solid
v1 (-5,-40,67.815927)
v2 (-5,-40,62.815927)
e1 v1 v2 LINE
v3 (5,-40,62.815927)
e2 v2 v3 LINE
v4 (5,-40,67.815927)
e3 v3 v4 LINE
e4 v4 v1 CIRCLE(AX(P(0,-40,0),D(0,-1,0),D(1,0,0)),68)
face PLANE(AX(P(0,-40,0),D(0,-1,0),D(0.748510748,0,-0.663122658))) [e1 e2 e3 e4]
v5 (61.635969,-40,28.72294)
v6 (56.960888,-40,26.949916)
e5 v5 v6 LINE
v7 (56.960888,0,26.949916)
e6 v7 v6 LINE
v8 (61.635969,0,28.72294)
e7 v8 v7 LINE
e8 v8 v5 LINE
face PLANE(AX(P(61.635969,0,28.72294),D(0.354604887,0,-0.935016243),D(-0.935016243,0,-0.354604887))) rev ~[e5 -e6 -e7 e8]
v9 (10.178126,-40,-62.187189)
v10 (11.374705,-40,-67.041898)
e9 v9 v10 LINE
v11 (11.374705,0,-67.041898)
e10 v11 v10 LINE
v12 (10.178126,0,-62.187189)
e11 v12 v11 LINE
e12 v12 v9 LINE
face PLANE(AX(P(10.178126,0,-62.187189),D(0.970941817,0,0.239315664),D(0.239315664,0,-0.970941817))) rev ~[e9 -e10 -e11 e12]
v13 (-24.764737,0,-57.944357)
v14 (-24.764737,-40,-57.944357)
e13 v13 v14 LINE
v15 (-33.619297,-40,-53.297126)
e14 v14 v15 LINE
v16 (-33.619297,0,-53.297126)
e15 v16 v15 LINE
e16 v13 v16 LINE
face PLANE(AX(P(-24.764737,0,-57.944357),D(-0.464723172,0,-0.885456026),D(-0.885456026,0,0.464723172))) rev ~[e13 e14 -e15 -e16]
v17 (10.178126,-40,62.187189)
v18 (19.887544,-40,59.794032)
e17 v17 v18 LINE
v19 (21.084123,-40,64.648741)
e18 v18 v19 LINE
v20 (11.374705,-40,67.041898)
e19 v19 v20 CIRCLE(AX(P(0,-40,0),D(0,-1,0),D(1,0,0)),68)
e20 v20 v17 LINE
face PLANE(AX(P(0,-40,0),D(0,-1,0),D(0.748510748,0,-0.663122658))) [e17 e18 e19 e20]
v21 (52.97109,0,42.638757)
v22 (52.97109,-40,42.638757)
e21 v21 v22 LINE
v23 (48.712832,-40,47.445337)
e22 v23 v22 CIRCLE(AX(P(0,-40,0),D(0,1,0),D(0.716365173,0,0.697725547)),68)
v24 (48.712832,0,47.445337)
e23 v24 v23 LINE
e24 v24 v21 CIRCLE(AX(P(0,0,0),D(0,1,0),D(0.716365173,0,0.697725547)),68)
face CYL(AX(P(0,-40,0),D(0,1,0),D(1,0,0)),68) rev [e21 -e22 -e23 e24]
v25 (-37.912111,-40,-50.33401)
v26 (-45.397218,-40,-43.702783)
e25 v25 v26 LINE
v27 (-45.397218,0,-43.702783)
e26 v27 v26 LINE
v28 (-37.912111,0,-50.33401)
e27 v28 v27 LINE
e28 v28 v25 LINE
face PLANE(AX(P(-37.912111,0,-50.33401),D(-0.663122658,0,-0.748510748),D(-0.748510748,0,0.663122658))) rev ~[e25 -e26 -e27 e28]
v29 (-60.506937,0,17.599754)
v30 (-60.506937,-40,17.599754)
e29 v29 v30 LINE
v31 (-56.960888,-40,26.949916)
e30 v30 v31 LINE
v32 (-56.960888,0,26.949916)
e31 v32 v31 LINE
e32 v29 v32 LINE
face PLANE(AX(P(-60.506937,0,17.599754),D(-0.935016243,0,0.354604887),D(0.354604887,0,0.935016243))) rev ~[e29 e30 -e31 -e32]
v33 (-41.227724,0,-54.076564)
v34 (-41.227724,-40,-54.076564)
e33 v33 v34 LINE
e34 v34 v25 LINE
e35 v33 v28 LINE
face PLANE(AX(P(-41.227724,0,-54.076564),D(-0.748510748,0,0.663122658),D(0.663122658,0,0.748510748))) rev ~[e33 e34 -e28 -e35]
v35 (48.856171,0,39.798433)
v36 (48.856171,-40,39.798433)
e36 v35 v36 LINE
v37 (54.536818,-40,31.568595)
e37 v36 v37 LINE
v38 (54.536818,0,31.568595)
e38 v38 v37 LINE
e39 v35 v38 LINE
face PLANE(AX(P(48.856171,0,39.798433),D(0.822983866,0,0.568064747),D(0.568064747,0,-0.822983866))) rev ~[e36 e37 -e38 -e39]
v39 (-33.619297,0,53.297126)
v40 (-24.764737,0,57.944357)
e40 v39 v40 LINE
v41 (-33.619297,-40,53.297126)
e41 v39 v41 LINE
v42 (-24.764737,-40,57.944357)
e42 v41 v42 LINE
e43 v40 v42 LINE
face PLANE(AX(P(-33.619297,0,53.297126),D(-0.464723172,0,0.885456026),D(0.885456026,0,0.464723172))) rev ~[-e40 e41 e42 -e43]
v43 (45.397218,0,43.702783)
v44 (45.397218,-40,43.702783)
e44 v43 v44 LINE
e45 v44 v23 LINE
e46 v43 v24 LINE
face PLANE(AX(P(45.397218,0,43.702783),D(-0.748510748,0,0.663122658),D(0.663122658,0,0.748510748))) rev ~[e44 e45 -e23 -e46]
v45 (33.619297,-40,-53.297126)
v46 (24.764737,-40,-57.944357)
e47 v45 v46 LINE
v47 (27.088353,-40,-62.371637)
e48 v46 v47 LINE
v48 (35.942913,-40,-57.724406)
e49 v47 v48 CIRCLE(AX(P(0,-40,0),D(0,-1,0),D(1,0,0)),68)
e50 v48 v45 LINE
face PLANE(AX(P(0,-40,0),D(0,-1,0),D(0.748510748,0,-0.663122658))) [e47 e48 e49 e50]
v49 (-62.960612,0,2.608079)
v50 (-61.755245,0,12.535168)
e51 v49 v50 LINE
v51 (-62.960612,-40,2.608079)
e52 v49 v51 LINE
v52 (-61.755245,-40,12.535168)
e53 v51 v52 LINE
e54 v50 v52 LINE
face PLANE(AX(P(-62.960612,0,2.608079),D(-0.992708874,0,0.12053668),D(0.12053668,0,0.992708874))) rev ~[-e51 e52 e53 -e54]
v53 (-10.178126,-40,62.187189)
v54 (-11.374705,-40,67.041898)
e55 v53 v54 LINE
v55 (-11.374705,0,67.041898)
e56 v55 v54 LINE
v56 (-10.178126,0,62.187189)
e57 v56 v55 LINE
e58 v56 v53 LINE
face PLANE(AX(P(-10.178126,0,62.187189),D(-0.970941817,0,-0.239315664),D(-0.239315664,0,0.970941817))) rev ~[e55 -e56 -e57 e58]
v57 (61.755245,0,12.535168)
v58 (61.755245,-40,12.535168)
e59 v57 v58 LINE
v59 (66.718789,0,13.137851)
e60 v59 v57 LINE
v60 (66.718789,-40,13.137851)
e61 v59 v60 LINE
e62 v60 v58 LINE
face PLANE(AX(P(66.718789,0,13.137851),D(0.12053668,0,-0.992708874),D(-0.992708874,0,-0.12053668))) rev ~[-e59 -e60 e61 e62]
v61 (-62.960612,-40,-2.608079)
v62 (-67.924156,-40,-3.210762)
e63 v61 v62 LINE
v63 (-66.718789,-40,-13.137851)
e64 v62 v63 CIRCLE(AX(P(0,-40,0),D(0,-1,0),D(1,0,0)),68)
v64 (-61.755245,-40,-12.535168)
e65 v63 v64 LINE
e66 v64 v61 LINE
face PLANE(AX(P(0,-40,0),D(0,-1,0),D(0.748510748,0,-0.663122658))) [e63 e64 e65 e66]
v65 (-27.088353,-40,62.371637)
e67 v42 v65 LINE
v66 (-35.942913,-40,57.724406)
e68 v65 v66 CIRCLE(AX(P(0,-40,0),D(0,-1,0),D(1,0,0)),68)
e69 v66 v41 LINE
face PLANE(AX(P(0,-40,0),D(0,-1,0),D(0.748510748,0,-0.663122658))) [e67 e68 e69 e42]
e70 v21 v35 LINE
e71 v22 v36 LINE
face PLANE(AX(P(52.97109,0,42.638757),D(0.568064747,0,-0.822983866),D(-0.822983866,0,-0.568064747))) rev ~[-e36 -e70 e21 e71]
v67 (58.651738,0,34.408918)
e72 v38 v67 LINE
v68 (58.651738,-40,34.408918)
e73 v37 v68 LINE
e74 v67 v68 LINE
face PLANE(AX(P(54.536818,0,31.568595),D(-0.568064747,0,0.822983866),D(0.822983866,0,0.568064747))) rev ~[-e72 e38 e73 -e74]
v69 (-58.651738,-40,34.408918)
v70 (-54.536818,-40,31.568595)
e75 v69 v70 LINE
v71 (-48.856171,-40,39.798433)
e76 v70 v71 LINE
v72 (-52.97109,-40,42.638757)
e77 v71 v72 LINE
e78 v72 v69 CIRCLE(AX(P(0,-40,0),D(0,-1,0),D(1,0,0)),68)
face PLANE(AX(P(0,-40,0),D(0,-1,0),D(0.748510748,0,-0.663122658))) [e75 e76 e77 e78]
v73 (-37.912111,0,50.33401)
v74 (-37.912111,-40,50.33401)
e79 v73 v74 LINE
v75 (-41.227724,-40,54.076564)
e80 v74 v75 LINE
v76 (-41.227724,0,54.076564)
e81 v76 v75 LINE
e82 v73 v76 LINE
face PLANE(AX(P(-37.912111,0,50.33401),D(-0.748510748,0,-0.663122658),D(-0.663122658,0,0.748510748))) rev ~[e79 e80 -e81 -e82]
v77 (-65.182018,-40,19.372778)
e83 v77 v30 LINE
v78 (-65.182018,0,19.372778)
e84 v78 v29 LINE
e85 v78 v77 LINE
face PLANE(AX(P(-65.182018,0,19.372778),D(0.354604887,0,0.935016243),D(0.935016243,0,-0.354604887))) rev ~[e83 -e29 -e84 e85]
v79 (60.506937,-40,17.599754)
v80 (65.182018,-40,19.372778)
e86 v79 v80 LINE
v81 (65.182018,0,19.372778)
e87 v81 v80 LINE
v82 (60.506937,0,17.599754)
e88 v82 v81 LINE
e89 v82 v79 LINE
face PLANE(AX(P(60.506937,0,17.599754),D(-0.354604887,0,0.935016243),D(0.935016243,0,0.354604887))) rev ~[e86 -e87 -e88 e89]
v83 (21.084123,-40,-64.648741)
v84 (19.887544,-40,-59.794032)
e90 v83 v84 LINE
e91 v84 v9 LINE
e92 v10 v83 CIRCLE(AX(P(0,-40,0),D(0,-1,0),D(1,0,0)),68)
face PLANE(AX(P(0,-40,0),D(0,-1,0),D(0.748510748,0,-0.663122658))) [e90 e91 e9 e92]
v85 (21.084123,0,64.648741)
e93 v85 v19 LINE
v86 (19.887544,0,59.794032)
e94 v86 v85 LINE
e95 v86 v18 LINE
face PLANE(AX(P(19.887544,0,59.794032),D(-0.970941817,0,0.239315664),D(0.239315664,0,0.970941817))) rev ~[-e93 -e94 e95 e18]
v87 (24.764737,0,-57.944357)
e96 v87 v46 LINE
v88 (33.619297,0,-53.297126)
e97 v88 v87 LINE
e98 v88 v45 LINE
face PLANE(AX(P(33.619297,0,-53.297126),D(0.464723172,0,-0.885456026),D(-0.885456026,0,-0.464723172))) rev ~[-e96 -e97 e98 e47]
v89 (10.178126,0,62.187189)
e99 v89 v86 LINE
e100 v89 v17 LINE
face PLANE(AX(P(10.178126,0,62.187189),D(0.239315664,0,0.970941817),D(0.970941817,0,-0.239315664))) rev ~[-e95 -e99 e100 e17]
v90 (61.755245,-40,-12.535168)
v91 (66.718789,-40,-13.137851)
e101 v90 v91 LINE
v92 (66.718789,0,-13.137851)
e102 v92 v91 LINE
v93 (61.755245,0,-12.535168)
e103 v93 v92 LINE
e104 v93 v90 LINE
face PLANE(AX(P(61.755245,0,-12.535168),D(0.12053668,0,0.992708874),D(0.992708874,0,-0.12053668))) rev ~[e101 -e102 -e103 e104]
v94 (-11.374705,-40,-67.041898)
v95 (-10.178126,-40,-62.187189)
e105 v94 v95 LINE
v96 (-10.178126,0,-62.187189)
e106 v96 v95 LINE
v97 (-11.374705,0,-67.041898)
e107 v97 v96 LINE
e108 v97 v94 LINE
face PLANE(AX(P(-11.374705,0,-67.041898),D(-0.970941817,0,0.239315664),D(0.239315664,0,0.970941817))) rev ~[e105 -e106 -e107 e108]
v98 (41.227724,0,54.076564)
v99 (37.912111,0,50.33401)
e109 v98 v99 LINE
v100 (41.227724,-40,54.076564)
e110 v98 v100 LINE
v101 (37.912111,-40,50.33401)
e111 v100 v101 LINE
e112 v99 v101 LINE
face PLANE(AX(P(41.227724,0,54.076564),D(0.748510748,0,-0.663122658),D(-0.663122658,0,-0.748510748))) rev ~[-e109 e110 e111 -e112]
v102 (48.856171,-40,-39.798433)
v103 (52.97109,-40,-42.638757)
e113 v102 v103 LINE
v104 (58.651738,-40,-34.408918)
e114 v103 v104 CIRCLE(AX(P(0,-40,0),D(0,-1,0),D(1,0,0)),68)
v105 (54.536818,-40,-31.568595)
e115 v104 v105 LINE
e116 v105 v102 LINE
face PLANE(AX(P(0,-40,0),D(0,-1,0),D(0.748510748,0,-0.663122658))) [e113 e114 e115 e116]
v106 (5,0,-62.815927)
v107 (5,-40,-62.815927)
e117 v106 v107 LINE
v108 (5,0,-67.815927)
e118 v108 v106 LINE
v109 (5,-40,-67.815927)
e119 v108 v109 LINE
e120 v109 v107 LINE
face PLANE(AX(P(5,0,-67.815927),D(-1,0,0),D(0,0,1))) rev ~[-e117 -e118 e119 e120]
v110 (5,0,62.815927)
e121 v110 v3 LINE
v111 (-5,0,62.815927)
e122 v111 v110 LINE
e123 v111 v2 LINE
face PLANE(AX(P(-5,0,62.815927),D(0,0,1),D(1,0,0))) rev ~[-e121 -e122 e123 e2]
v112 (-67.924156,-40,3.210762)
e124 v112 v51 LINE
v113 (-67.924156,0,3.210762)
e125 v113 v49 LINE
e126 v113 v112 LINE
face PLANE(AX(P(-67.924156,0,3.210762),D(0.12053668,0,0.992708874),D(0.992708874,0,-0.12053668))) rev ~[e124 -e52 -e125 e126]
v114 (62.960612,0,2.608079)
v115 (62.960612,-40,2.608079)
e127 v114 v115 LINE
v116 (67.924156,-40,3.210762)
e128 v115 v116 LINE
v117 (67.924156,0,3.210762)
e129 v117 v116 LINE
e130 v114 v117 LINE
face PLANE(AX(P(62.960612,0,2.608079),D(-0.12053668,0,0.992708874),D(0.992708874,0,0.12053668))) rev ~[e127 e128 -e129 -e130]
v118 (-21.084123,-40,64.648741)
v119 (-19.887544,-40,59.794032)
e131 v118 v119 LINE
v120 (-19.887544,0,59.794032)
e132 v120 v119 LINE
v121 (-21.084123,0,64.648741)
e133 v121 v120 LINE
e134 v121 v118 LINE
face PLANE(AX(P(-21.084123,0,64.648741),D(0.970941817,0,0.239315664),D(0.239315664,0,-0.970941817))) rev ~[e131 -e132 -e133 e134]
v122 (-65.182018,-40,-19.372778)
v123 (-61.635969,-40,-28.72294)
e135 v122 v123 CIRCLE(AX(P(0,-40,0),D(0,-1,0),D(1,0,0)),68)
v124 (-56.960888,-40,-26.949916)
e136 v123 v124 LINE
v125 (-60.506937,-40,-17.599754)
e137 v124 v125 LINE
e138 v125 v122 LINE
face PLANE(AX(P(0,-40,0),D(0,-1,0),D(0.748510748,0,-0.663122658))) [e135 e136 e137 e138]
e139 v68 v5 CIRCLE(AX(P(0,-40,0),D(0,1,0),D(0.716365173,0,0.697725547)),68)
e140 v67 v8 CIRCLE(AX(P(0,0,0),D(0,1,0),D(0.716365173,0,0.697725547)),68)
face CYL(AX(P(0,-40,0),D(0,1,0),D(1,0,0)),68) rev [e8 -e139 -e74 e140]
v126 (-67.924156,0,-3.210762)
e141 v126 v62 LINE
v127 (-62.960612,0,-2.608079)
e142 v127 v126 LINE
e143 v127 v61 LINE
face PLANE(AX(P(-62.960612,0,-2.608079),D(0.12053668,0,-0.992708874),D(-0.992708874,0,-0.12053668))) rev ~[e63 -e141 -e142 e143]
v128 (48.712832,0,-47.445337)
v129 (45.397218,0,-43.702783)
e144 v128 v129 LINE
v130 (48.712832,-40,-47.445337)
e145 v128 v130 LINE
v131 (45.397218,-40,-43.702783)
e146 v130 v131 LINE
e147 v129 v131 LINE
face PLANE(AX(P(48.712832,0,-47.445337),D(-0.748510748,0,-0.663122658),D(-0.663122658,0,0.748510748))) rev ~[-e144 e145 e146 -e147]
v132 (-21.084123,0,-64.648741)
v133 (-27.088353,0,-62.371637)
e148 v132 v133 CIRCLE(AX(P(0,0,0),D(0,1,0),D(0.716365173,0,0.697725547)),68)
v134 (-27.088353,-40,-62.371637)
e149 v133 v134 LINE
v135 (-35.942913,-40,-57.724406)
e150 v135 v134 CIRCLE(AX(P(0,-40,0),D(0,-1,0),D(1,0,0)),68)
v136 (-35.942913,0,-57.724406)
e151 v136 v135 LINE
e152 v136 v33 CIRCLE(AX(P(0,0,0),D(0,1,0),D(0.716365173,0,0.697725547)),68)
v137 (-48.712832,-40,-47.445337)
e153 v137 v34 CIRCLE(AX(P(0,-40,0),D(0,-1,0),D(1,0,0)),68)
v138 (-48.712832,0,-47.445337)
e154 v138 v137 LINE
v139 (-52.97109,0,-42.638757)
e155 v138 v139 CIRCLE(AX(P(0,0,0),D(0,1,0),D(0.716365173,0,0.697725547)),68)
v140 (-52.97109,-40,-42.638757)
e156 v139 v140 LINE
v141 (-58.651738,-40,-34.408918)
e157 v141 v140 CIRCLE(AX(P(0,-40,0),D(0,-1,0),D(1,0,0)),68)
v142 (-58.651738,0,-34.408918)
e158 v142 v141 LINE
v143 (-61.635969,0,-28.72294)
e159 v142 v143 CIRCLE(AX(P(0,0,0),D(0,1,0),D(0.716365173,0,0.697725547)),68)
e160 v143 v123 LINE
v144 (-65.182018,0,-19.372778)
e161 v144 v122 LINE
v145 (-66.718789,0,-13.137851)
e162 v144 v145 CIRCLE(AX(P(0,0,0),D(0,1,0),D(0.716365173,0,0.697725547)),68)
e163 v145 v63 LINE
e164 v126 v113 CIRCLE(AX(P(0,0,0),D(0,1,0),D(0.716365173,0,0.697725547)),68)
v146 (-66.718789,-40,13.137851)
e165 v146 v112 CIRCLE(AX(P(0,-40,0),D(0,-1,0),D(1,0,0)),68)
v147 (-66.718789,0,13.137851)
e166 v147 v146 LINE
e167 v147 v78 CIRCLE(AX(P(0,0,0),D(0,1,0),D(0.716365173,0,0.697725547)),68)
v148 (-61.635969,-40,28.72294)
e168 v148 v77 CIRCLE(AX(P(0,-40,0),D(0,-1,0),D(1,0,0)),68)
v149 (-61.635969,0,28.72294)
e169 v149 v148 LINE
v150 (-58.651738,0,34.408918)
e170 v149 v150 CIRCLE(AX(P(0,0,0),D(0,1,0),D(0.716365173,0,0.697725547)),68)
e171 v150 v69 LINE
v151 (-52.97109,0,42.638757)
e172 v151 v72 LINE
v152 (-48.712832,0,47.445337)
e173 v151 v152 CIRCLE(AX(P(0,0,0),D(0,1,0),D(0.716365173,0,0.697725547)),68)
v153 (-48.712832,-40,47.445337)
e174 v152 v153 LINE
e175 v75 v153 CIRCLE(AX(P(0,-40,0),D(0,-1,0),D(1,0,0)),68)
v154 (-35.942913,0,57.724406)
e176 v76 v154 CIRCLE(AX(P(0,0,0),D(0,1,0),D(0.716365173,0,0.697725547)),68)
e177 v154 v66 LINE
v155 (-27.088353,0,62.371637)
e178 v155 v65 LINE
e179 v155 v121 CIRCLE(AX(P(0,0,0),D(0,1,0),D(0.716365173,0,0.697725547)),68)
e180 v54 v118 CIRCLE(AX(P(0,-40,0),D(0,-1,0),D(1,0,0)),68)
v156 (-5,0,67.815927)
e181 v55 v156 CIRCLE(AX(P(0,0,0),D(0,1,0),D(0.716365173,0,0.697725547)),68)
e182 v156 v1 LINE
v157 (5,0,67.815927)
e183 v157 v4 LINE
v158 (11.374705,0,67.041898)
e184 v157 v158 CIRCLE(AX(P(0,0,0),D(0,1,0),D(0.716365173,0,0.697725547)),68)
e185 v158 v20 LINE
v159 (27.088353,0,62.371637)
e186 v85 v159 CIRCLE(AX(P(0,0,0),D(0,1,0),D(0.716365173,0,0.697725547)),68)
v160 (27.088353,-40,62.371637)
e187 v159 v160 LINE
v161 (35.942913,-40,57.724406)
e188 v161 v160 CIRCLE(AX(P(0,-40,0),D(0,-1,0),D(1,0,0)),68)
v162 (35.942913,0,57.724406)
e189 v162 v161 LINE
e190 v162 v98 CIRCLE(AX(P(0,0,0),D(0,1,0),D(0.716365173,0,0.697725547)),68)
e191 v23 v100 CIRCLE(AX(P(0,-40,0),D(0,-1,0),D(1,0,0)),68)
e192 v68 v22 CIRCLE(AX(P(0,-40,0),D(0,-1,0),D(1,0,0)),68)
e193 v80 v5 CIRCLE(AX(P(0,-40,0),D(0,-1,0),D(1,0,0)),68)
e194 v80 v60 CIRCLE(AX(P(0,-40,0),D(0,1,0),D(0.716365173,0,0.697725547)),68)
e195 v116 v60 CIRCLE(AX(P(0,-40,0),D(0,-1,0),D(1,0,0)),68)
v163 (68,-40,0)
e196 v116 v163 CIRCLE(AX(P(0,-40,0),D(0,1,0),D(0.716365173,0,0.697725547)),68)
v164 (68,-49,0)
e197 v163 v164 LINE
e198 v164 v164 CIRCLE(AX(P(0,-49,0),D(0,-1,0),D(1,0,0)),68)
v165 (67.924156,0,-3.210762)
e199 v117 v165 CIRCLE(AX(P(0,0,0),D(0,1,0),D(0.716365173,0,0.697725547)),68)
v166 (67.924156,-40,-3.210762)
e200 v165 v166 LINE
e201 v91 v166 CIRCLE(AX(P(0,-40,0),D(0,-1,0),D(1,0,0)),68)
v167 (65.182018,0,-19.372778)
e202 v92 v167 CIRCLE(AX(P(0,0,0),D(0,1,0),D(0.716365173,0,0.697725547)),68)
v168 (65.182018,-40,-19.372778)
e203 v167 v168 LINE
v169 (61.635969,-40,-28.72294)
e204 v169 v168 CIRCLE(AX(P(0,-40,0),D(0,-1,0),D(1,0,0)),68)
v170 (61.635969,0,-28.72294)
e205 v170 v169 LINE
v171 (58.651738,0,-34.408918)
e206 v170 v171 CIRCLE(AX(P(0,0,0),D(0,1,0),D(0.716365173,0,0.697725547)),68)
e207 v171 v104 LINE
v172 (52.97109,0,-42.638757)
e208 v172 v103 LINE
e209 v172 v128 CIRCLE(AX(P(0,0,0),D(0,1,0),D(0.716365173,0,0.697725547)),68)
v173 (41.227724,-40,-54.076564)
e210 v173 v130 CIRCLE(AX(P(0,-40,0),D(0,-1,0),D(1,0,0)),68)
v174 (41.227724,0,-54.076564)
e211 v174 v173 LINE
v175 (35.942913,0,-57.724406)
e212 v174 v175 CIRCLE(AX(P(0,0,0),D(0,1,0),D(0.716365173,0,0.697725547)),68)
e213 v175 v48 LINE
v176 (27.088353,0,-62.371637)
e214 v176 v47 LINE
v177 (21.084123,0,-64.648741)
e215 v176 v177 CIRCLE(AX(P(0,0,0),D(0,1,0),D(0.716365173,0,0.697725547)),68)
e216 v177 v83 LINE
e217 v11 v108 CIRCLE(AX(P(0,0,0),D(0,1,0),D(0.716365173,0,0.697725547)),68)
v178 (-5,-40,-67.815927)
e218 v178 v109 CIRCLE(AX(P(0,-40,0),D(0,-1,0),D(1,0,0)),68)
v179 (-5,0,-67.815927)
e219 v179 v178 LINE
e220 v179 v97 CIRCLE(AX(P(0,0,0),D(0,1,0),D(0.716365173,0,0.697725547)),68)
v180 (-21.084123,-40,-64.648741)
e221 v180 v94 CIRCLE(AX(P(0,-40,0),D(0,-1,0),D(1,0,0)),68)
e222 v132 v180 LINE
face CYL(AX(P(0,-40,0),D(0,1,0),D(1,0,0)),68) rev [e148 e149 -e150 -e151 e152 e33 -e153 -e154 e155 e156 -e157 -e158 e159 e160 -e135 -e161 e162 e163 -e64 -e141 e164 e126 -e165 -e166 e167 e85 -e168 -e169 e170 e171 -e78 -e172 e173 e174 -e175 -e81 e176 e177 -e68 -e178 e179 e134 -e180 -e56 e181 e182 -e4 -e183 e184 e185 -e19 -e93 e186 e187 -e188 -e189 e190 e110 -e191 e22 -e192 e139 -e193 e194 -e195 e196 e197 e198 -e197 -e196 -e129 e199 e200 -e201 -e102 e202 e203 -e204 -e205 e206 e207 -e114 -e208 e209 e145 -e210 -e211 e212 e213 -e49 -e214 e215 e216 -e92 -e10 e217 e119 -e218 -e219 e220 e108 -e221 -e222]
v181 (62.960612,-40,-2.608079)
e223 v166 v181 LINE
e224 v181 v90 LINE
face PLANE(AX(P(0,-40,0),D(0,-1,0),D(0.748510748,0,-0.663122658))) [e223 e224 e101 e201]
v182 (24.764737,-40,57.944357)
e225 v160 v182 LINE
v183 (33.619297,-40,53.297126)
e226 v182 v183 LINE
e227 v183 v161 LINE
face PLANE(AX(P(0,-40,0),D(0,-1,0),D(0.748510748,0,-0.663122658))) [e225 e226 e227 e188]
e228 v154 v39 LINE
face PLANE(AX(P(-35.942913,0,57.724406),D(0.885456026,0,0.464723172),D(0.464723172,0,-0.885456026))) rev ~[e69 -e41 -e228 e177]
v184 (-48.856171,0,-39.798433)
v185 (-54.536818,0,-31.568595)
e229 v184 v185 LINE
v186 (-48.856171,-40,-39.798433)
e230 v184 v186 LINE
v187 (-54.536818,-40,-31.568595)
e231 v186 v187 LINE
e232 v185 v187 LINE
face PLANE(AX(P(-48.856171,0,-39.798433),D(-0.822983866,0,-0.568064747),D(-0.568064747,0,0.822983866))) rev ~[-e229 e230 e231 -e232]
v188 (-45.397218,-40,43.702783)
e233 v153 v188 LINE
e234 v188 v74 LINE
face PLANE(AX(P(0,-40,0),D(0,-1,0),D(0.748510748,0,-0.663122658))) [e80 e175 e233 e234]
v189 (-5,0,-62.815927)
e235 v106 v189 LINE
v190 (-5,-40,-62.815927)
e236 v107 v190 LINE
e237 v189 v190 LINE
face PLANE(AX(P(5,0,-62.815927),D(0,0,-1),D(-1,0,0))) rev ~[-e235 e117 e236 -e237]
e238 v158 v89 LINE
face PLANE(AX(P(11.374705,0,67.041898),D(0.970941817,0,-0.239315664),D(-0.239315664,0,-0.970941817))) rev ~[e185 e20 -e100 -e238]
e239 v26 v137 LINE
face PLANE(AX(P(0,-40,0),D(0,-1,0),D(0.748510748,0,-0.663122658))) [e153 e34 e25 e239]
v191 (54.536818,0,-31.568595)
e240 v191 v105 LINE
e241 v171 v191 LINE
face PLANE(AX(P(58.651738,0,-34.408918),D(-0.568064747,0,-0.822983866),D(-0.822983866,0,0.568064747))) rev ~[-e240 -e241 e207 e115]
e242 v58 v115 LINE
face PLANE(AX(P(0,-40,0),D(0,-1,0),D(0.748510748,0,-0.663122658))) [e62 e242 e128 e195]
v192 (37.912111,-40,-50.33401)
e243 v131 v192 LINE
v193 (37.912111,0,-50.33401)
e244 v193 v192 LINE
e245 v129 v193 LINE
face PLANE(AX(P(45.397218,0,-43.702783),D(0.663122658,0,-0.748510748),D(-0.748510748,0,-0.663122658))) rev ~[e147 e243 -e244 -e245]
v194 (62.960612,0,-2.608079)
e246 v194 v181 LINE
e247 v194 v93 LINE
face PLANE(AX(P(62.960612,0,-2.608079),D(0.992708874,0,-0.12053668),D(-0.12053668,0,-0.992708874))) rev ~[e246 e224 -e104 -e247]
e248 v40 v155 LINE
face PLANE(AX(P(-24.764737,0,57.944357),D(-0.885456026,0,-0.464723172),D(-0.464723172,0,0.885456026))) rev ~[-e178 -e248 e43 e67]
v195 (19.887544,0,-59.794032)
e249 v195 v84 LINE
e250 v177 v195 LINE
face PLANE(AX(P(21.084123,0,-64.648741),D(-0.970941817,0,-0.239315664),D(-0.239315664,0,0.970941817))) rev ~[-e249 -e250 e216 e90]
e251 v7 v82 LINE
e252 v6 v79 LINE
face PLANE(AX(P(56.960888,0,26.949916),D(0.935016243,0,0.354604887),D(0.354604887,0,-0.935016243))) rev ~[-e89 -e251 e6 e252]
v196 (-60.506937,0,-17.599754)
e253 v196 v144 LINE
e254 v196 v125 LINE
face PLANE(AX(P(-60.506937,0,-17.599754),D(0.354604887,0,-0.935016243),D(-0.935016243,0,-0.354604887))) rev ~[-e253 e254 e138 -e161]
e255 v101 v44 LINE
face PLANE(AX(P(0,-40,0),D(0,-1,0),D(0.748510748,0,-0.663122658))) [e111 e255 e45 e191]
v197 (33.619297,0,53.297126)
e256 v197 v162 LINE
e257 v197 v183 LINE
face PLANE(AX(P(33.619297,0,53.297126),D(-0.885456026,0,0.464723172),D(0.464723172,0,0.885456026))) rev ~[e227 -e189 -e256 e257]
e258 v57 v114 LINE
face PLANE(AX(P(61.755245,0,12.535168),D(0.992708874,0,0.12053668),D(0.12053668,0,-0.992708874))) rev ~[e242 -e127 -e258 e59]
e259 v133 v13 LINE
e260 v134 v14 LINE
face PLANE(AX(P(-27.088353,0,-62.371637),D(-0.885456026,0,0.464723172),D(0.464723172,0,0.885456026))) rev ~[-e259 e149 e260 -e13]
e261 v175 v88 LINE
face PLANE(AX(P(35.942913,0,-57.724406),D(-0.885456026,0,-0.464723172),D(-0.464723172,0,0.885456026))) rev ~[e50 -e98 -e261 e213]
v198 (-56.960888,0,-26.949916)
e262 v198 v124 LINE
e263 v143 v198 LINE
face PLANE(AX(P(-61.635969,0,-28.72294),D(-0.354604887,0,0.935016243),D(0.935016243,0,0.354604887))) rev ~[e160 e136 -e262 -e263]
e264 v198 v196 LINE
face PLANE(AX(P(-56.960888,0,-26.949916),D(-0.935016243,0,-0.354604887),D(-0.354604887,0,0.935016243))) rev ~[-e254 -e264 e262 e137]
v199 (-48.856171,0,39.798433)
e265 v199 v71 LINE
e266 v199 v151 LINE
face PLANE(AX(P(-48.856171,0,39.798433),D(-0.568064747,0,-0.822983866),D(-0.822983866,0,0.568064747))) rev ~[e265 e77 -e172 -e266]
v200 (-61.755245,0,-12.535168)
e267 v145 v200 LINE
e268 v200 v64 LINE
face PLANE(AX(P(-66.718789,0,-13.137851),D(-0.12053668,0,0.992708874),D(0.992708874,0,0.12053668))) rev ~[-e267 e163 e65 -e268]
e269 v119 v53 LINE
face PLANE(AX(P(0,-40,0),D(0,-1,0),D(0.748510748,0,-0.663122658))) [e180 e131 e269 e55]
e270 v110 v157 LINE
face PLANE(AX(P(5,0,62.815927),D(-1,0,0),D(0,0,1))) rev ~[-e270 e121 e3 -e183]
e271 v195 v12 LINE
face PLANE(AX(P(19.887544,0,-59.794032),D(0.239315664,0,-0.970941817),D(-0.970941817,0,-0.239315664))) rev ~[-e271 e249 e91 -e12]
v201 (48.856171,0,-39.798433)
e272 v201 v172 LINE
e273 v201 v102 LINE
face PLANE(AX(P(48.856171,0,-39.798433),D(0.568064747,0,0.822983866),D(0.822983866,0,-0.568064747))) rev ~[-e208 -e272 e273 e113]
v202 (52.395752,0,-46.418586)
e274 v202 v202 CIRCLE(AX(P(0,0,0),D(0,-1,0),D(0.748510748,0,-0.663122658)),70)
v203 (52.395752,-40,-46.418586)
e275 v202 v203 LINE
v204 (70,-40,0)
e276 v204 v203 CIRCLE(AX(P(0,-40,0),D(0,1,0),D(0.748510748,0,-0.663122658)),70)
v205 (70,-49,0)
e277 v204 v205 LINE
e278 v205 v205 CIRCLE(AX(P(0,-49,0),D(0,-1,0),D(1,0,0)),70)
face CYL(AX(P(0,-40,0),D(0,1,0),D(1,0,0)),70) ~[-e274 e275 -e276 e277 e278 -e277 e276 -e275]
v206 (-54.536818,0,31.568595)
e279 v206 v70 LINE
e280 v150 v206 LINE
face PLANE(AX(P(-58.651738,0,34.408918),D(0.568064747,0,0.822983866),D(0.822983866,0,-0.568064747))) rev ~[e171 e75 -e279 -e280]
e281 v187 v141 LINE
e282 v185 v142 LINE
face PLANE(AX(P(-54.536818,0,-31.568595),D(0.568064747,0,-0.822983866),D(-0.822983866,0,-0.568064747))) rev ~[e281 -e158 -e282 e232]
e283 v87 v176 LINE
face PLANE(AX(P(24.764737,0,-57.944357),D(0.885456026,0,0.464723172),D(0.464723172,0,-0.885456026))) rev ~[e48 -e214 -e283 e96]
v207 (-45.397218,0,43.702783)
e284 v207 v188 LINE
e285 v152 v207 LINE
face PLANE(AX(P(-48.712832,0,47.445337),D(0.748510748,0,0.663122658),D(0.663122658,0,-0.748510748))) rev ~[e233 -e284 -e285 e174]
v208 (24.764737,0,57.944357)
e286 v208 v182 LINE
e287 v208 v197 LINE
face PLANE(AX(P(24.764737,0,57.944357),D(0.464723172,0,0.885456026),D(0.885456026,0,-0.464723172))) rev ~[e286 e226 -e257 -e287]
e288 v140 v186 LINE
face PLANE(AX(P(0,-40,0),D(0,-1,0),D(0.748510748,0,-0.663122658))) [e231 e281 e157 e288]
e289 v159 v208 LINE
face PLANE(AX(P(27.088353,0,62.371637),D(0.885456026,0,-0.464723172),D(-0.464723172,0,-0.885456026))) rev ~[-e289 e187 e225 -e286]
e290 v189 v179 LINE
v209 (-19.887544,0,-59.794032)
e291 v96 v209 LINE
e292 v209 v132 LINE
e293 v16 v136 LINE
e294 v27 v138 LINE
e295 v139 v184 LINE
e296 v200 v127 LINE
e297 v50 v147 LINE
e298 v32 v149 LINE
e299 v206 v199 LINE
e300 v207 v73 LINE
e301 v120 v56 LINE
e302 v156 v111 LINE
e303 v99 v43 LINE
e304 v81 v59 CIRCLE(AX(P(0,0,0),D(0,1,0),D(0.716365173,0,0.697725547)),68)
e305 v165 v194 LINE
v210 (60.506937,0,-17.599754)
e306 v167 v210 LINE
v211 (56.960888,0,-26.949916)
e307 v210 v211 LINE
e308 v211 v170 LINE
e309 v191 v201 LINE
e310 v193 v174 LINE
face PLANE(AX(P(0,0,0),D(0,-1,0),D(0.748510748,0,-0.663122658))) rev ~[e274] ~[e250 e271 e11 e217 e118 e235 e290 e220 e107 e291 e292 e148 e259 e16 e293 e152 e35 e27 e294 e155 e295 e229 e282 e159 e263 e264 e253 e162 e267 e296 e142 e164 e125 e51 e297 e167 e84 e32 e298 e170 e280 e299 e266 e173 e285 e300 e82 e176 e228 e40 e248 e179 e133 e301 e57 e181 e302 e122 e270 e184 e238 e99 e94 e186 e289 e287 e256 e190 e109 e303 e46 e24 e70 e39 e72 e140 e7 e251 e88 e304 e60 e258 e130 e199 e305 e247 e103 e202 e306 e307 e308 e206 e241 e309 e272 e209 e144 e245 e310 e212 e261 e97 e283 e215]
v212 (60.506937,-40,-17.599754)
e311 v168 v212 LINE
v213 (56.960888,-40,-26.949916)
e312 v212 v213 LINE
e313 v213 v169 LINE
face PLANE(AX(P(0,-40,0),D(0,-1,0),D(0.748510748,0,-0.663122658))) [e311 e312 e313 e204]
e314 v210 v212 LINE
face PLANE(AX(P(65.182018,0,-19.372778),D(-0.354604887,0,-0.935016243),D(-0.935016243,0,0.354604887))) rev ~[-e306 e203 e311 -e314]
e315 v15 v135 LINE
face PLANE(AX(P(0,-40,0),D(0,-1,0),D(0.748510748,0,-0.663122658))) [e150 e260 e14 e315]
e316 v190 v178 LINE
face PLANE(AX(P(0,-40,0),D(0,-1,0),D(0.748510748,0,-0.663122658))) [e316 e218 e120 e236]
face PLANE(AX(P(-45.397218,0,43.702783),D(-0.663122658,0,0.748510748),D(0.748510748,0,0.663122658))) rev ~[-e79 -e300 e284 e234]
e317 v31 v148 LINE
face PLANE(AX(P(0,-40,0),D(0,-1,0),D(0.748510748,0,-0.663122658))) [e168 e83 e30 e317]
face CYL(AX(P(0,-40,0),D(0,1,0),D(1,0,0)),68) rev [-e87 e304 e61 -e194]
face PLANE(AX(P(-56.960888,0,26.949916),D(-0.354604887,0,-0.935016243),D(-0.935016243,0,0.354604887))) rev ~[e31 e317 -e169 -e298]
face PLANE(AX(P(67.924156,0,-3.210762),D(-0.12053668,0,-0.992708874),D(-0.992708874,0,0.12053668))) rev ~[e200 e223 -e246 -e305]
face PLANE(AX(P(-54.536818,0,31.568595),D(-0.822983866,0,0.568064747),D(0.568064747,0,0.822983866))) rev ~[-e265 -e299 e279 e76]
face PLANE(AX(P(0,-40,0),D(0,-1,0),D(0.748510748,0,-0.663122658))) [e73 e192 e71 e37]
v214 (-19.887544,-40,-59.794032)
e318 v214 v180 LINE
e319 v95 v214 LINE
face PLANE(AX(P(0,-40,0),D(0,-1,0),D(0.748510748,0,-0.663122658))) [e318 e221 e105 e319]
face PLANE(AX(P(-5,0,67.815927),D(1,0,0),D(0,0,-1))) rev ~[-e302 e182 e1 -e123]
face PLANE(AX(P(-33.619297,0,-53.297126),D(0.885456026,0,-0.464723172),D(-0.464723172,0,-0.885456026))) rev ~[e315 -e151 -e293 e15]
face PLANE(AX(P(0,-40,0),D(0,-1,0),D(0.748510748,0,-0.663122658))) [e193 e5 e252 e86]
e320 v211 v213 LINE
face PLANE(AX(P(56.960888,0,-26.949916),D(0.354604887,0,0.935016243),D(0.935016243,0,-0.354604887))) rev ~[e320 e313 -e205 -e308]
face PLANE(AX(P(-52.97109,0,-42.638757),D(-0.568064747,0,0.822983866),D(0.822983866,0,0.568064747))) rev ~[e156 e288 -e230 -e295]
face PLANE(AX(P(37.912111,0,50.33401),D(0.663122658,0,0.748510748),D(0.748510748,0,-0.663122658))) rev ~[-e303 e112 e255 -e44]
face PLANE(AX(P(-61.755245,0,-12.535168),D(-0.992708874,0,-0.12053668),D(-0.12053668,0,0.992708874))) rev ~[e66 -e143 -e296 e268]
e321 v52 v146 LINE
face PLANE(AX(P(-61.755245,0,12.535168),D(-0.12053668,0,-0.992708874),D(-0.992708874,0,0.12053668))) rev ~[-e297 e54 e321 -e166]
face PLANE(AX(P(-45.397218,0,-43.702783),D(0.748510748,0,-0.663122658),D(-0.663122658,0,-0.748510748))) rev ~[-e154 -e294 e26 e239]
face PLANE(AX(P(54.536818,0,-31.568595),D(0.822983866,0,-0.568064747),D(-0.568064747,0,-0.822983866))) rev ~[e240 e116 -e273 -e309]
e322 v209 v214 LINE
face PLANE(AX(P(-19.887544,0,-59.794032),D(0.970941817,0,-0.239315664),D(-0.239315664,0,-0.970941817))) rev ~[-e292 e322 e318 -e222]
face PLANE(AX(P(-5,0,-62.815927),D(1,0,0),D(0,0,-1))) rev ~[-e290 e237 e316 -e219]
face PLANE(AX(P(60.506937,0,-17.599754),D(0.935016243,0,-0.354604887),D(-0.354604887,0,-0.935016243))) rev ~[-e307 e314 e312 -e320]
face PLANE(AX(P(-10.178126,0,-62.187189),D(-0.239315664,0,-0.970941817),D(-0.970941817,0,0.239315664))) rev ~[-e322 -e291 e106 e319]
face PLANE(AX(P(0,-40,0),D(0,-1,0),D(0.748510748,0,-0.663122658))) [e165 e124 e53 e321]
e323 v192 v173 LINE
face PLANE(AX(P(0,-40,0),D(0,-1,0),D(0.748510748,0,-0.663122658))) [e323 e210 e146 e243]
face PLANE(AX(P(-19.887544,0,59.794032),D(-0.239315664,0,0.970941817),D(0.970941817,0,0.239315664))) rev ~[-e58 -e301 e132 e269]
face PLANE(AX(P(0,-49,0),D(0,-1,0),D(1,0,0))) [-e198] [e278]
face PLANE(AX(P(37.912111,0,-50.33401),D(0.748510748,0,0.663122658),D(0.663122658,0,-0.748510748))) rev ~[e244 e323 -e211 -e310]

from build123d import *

# Parameters (mm, degrees)
F0_R     = 70
F1_DEPTH = 40
F2_COUNT = 26
F4_R     = 70
F4_R_2   = 68
F5_DEPTH = 9


with BuildPart() as f1:
    # F0 (on Front) → F1 (new body)
    with BuildSketch(Plane.XZ):
        Circle(F0_R)
        with BuildLine():
            ThreePointArc((5, 67.8159273327), (49.8196748283, 46.2817458616), (68, 0))
            ThreePointArc((68, 0), (-46.2817458616, -49.8196748283), (-5, 67.8159273327))
            ThreePointArc((-5, 67.8159273327), (0, 68), (5, 67.8159273327))
        make_face(mode=Mode.SUBTRACT)
        with BuildLine():
            Line((5, 62.8159273327), (5, 67.8159273327))
            ThreePointArc((5, 67.8159273327), (0, 68), (-5, 67.8159273327))
            Line((-5, 67.8159273327), (-5, 62.8159273327))
            Line((-5, 62.8159273327), (5, 62.8159273327))
        make_face()
    extrude(amount=F1_DEPTH)


with BuildPart() as f2_1:
    # F2: instance of F1
    add(f1.part.rotate(Axis((0, 0, 0), (0, 1, 0)), 1 * 360 / F2_COUNT))


with BuildPart() as f2_2:
    # F2: instance of F1
    add(f1.part.rotate(Axis((0, 0, 0), (0, 1, 0)), 2 * 360 / F2_COUNT))


with BuildPart() as f2_3:
    # F2: instance of F1
    add(f1.part.rotate(Axis((0, 0, 0), (0, 1, 0)), 3 * 360 / F2_COUNT))


with BuildPart() as f2_4:
    # F2: instance of F1
    add(f1.part.rotate(Axis((0, 0, 0), (0, 1, 0)), 4 * 360 / F2_COUNT))


with BuildPart() as f2_5:
    # F2: instance of F1
    add(f1.part.rotate(Axis((0, 0, 0), (0, 1, 0)), 5 * 360 / F2_COUNT))


with BuildPart() as f2_6:
    # F2: instance of F1
    add(f1.part.rotate(Axis((0, 0, 0), (0, 1, 0)), 6 * 360 / F2_COUNT))


with BuildPart() as f2_7:
    # F2: instance of F1
    add(f1.part.rotate(Axis((0, 0, 0), (0, 1, 0)), 7 * 360 / F2_COUNT))


with BuildPart() as f2_8:
    # F2: instance of F1
    add(f1.part.rotate(Axis((0, 0, 0), (0, 1, 0)), 8 * 360 / F2_COUNT))


with BuildPart() as f2_9:
    # F2: instance of F1
    add(f1.part.rotate(Axis((0, 0, 0), (0, 1, 0)), 9 * 360 / F2_COUNT))


with BuildPart() as f2_10:
    # F2: instance of F1
    add(f1.part.rotate(Axis((0, 0, 0), (0, 1, 0)), 10 * 360 / F2_COUNT))


with BuildPart() as f2_11:
    # F2: instance of F1
    add(f1.part.rotate(Axis((0, 0, 0), (0, 1, 0)), 11 * 360 / F2_COUNT))


with BuildPart() as f2_12:
    # F2: instance of F1
    add(f1.part.rotate(Axis((0, 0, 0), (0, 1, 0)), 12 * 360 / F2_COUNT))


with BuildPart() as f2_13:
    # F2: instance of F1
    add(f1.part.rotate(Axis((0, 0, 0), (0, 1, 0)), 13 * 360 / F2_COUNT))


with BuildPart() as f2_14:
    # F2: instance of F1
    add(f1.part.rotate(Axis((0, 0, 0), (0, 1, 0)), 14 * 360 / F2_COUNT))


with BuildPart() as f2_15:
    # F2: instance of F1
    add(f1.part.rotate(Axis((0, 0, 0), (0, 1, 0)), 15 * 360 / F2_COUNT))


with BuildPart() as f2_16:
    # F2: instance of F1
    add(f1.part.rotate(Axis((0, 0, 0), (0, 1, 0)), 16 * 360 / F2_COUNT))


with BuildPart() as f2_17:
    # F2: instance of F1
    add(f1.part.rotate(Axis((0, 0, 0), (0, 1, 0)), 17 * 360 / F2_COUNT))


with BuildPart() as f2_18:
    # F2: instance of F1
    add(f1.part.rotate(Axis((0, 0, 0), (0, 1, 0)), 18 * 360 / F2_COUNT))


with BuildPart() as f2_19:
    # F2: instance of F1
    add(f1.part.rotate(Axis((0, 0, 0), (0, 1, 0)), 19 * 360 / F2_COUNT))


with BuildPart() as f2_20:
    # F2: instance of F1
    add(f1.part.rotate(Axis((0, 0, 0), (0, 1, 0)), 20 * 360 / F2_COUNT))


with BuildPart() as f2_21:
    # F2: instance of F1
    add(f1.part.rotate(Axis((0, 0, 0), (0, 1, 0)), 21 * 360 / F2_COUNT))


with BuildPart() as f2_22:
    # F2: instance of F1
    add(f1.part.rotate(Axis((0, 0, 0), (0, 1, 0)), 22 * 360 / F2_COUNT))


with BuildPart() as f2_23:
    # F2: instance of F1
    add(f1.part.rotate(Axis((0, 0, 0), (0, 1, 0)), 23 * 360 / F2_COUNT))


with BuildPart() as f2_24:
    # F2: instance of F1
    add(f1.part.rotate(Axis((0, 0, 0), (0, 1, 0)), 24 * 360 / F2_COUNT))


with BuildPart() as f2_25:
    # F2: instance of F1
    add(f1.part.rotate(Axis((0, 0, 0), (0, 1, 0)), 25 * 360 / F2_COUNT))


with BuildPart() as f2_3_1:
    add(f2_3.part)

    # F3: union F2_4, F2_6, F2_10, F2_8, F2_11, F2_12, F2_9, F2_2, F2_15, F2_13, F2_16, F2_14, F2_19, F2_18, F2_17, F2_7, F2_23, F2_22, F2_21, F2_20, F2_24, F2_1, F1, F2_25, F2_5
    add(f2_4.part)
    add(f2_6.part)
    add(f2_10.part)
    add(f2_8.part)
    add(f2_11.part)
    add(f2_12.part)
    add(f2_9.part)
    add(f2_2.part)
    add(f2_15.part)
    add(f2_13.part)
    add(f2_16.part)
    add(f2_14.part)
    add(f2_19.part)
    add(f2_18.part)
    add(f2_17.part)
    add(f2_7.part)
    add(f2_23.part)
    add(f2_22.part)
    add(f2_21.part)
    add(f2_20.part)
    add(f2_24.part)
    add(f2_1.part)
    add(f1.part)
    add(f2_25.part)
    add(f2_5.part)

    # F4 (on face) → F5 (join)
    with BuildSketch(Plane.XZ.offset(40)):
        Circle(F4_R)
        Circle(F4_R_2, mode=Mode.SUBTRACT)
    extrude(amount=F5_DEPTH)


solid = f2_3_1.part
